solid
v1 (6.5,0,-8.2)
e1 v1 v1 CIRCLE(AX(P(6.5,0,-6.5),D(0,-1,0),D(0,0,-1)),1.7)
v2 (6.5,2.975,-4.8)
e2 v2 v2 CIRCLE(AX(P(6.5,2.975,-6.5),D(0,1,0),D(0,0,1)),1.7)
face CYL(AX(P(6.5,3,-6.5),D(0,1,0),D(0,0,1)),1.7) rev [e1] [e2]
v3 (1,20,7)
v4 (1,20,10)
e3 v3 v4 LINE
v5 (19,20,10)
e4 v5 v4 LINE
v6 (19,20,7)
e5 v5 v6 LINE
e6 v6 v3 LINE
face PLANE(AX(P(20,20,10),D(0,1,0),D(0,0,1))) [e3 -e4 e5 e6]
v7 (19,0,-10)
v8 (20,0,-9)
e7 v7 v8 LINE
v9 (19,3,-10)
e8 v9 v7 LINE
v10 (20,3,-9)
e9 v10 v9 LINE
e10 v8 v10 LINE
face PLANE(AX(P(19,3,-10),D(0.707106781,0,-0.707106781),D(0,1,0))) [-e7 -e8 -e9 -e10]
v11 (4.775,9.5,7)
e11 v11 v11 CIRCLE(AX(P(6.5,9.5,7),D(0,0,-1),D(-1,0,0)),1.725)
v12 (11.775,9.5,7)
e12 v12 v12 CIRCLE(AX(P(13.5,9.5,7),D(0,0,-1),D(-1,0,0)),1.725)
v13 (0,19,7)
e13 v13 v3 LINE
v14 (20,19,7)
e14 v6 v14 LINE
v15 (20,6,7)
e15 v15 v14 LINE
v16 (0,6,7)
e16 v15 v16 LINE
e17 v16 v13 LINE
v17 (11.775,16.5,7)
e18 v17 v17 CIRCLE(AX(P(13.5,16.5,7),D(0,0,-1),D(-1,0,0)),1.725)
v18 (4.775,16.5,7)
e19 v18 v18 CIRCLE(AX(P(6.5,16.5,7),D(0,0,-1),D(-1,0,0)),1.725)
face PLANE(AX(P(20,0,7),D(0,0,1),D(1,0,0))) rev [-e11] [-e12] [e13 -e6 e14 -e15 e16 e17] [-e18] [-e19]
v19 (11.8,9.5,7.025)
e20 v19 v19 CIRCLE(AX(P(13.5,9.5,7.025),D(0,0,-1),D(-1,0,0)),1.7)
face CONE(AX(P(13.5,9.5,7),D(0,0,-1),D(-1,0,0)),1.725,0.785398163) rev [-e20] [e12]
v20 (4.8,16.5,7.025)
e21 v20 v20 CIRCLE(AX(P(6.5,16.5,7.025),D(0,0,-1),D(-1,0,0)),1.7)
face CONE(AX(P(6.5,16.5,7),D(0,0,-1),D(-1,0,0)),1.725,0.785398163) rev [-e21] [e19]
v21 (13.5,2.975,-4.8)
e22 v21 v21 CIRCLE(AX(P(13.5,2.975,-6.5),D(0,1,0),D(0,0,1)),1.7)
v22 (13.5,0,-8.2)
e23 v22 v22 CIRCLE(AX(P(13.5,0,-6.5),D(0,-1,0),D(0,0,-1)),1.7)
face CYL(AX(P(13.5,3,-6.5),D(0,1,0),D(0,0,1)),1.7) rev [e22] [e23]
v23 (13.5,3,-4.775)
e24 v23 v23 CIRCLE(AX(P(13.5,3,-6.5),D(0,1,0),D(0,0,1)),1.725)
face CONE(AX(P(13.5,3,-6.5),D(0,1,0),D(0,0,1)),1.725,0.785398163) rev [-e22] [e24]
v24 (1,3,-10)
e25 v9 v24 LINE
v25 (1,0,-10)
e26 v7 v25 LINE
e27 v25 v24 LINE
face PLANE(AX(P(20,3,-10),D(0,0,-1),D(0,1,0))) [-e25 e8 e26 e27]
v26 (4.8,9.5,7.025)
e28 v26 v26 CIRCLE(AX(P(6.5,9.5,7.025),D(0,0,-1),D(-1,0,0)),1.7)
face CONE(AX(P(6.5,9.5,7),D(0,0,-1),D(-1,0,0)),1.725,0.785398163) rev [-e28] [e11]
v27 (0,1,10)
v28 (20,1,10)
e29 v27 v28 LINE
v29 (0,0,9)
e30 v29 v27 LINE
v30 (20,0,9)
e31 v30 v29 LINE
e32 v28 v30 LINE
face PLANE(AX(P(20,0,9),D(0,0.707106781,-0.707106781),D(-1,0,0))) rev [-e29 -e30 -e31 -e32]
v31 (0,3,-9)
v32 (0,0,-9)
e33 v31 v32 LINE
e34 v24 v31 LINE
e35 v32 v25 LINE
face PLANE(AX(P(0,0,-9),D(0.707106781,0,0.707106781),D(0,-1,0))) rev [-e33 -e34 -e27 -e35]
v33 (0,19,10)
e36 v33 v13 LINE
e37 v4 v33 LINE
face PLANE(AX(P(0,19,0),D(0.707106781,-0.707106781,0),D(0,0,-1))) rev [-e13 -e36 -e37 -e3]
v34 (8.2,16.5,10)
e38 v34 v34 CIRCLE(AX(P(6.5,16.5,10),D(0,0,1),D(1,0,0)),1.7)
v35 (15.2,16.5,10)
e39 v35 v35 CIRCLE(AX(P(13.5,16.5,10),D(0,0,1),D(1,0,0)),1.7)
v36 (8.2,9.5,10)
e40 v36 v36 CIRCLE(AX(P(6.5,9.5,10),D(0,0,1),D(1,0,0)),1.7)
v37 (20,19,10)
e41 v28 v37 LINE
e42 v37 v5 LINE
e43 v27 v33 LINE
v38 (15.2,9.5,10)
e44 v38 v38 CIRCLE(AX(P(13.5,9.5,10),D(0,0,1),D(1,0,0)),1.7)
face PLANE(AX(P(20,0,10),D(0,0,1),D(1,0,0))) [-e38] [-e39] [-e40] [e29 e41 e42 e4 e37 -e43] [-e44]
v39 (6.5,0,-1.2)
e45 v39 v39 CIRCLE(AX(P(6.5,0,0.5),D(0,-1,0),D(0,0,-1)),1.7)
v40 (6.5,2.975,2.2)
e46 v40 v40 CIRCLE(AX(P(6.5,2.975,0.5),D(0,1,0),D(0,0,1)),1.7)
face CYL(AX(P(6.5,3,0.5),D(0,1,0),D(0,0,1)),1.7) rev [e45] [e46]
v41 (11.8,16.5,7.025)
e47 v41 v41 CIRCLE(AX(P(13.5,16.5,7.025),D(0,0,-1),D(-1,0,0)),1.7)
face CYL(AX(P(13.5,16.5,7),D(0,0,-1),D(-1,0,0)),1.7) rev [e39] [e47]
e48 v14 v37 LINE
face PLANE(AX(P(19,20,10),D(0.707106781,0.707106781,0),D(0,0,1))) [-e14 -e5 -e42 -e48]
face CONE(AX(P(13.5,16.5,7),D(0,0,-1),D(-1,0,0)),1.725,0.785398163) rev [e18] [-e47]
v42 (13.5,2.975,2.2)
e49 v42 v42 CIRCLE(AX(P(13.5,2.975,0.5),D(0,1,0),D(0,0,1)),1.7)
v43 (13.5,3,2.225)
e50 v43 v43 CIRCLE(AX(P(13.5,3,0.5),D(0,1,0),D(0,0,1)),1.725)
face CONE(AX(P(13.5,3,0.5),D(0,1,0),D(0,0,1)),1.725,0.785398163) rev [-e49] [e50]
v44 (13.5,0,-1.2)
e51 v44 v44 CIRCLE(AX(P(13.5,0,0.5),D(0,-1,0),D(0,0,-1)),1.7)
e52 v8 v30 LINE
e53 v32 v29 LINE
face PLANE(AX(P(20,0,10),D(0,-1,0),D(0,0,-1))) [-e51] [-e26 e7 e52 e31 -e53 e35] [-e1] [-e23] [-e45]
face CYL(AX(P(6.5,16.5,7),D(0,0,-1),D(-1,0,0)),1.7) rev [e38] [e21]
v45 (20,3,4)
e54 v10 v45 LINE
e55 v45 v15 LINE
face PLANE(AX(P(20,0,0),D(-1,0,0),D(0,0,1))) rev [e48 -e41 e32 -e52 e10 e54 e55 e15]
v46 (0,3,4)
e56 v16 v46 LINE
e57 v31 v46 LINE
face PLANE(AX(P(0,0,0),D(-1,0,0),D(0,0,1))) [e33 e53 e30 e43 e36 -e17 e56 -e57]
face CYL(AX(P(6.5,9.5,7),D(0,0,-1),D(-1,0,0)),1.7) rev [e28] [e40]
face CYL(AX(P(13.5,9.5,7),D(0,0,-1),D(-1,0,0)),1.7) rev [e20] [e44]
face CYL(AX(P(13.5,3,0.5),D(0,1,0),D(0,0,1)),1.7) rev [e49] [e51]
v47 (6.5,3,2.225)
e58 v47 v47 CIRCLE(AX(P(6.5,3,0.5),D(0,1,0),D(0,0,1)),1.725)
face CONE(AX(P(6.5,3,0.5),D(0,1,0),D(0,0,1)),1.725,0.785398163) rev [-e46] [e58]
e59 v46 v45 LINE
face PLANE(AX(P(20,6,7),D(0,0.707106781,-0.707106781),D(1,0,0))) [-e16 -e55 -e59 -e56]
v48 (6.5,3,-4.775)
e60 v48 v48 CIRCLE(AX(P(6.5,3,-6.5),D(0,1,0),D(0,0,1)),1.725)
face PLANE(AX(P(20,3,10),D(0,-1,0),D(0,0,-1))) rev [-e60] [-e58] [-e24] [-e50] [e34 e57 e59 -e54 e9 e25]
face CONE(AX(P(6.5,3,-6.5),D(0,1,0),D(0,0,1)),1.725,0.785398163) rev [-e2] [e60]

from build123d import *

# Parameters (mm, degrees)
EXTRUDE_THIN1_DEPTH            = 20
CHAMFER1_SIZE                  = 3
M3_CLEARANCE_HOLE1_D           = 3.4
M3_CLEARANCE_HOLE1_DEPTH       = 6
M3_CLEARANCE_HOLE1_CSINK_D     = 3.45
M3_CLEARANCE_HOLE1_CSINK_ANGLE = 90
M3_CLEARANCE_HOLE1_TIP         = 1.021463052
CHAMFER2_SIZE                  = 1


# Read off the part's stored shape, not the designer's step: M3 Clearance Hole2
with BuildPart() as part:
    # Sketch2 → Extrude-Thin1 (new body)
    with BuildSketch(Plane(origin=(0, 0, 0), x_dir=(0, 0, -1), z_dir=(1, 0, 0))):
        Polygon((-10, 20), (-10, 0), (10, 0), (10, 3), (-7, 3), (-7, 20), align=None)
    extrude(amount=EXTRUDE_THIN1_DEPTH)

    # Chamfer1
    chamfer1_edges = [part.edges().sort_by_distance(p)[0] for p in [
        (10, 3, 7),
    ]]
    chamfer(chamfer1_edges, length=CHAMFER1_SIZE)

    # M3 Clearance Hole1
    with Locations(Plane(origin=(0, 3, 0), x_dir=(1, 0, 0), z_dir=(0, 1, 0))):
        with Locations((6.5, 6.5), (13.5, 6.5), (13.5, -0.5), (6.5, -0.5)):
            CounterSinkHole(M3_CLEARANCE_HOLE1_D / 2, M3_CLEARANCE_HOLE1_CSINK_D / 2, depth=M3_CLEARANCE_HOLE1_DEPTH, counter_sink_angle=M3_CLEARANCE_HOLE1_CSINK_ANGLE)
            with Locations((0, 0, -(M3_CLEARANCE_HOLE1_DEPTH + M3_CLEARANCE_HOLE1_TIP / 2))):  # 118° drill point
                Cone(0, M3_CLEARANCE_HOLE1_D / 2, M3_CLEARANCE_HOLE1_TIP, mode=Mode.SUBTRACT)

    # M3 Clearance Hole2 outline → M3 Clearance Hole2 (revolve, cut)
    with BuildSketch(Plane(origin=(6.5, 9.5, 0), x_dir=(1, 0, 0), z_dir=(0, -1, 0))):
        Polygon((1.7, 7.025), (1.7, 10), (0, 10), (0, 7), (1.725, 7), align=None)
    revolve(axis=Axis((6.5, 9.5, 0), (0, 0, 1)), mode=Mode.SUBTRACT)

    # M3 Clearance Hole2 2 outline → M3 Clearance Hole2 2 (revolve, cut)
    with BuildSketch(Plane(origin=(13.5, 16.5, 0), x_dir=(1, 0, 0), z_dir=(0, -1, 0))):
        Polygon((1.7, 7.025), (1.7, 10), (0, 10), (0, 7), (1.725, 7), align=None)
    revolve(axis=Axis((13.5, 16.5, 0), (0, 0, 1)), mode=Mode.SUBTRACT)

    # M3 Clearance Hole2 3 outline → M3 Clearance Hole2 3 (revolve, cut)
    with BuildSketch(Plane(origin=(13.5, 9.5, 0), x_dir=(1, 0, 0), z_dir=(0, -1, 0))):
        Polygon((1.7, 7.025), (1.7, 10), (0, 10), (0, 7), (1.725, 7), align=None)
    revolve(axis=Axis((13.5, 9.5, 0), (0, 0, 1)), mode=Mode.SUBTRACT)

    # M3 Clearance Hole2 4 outline → M3 Clearance Hole2 4 (revolve, cut)
    with BuildSketch(Plane(origin=(6.5, 16.5, 0), x_dir=(1, 0, 0), z_dir=(0, -1, 0))):
        Polygon((1.7, 7.025), (1.7, 10), (0, 10), (0, 7), (1.725, 7), align=None)
    revolve(axis=Axis((6.5, 16.5, 0), (0, 0, 1)), mode=Mode.SUBTRACT)

    # Chamfer2
    chamfer2_edges = [part.edges().sort_by_distance(p)[0] for p in [
        (20, 1.5, -10),
        (0, 1.5, -10),
        (0, 20, 8.5),
        (20, 20, 8.5),
        (10, 0, 10),
    ]]
    chamfer(chamfer2_edges, length=CHAMFER2_SIZE)


solid = part.part
